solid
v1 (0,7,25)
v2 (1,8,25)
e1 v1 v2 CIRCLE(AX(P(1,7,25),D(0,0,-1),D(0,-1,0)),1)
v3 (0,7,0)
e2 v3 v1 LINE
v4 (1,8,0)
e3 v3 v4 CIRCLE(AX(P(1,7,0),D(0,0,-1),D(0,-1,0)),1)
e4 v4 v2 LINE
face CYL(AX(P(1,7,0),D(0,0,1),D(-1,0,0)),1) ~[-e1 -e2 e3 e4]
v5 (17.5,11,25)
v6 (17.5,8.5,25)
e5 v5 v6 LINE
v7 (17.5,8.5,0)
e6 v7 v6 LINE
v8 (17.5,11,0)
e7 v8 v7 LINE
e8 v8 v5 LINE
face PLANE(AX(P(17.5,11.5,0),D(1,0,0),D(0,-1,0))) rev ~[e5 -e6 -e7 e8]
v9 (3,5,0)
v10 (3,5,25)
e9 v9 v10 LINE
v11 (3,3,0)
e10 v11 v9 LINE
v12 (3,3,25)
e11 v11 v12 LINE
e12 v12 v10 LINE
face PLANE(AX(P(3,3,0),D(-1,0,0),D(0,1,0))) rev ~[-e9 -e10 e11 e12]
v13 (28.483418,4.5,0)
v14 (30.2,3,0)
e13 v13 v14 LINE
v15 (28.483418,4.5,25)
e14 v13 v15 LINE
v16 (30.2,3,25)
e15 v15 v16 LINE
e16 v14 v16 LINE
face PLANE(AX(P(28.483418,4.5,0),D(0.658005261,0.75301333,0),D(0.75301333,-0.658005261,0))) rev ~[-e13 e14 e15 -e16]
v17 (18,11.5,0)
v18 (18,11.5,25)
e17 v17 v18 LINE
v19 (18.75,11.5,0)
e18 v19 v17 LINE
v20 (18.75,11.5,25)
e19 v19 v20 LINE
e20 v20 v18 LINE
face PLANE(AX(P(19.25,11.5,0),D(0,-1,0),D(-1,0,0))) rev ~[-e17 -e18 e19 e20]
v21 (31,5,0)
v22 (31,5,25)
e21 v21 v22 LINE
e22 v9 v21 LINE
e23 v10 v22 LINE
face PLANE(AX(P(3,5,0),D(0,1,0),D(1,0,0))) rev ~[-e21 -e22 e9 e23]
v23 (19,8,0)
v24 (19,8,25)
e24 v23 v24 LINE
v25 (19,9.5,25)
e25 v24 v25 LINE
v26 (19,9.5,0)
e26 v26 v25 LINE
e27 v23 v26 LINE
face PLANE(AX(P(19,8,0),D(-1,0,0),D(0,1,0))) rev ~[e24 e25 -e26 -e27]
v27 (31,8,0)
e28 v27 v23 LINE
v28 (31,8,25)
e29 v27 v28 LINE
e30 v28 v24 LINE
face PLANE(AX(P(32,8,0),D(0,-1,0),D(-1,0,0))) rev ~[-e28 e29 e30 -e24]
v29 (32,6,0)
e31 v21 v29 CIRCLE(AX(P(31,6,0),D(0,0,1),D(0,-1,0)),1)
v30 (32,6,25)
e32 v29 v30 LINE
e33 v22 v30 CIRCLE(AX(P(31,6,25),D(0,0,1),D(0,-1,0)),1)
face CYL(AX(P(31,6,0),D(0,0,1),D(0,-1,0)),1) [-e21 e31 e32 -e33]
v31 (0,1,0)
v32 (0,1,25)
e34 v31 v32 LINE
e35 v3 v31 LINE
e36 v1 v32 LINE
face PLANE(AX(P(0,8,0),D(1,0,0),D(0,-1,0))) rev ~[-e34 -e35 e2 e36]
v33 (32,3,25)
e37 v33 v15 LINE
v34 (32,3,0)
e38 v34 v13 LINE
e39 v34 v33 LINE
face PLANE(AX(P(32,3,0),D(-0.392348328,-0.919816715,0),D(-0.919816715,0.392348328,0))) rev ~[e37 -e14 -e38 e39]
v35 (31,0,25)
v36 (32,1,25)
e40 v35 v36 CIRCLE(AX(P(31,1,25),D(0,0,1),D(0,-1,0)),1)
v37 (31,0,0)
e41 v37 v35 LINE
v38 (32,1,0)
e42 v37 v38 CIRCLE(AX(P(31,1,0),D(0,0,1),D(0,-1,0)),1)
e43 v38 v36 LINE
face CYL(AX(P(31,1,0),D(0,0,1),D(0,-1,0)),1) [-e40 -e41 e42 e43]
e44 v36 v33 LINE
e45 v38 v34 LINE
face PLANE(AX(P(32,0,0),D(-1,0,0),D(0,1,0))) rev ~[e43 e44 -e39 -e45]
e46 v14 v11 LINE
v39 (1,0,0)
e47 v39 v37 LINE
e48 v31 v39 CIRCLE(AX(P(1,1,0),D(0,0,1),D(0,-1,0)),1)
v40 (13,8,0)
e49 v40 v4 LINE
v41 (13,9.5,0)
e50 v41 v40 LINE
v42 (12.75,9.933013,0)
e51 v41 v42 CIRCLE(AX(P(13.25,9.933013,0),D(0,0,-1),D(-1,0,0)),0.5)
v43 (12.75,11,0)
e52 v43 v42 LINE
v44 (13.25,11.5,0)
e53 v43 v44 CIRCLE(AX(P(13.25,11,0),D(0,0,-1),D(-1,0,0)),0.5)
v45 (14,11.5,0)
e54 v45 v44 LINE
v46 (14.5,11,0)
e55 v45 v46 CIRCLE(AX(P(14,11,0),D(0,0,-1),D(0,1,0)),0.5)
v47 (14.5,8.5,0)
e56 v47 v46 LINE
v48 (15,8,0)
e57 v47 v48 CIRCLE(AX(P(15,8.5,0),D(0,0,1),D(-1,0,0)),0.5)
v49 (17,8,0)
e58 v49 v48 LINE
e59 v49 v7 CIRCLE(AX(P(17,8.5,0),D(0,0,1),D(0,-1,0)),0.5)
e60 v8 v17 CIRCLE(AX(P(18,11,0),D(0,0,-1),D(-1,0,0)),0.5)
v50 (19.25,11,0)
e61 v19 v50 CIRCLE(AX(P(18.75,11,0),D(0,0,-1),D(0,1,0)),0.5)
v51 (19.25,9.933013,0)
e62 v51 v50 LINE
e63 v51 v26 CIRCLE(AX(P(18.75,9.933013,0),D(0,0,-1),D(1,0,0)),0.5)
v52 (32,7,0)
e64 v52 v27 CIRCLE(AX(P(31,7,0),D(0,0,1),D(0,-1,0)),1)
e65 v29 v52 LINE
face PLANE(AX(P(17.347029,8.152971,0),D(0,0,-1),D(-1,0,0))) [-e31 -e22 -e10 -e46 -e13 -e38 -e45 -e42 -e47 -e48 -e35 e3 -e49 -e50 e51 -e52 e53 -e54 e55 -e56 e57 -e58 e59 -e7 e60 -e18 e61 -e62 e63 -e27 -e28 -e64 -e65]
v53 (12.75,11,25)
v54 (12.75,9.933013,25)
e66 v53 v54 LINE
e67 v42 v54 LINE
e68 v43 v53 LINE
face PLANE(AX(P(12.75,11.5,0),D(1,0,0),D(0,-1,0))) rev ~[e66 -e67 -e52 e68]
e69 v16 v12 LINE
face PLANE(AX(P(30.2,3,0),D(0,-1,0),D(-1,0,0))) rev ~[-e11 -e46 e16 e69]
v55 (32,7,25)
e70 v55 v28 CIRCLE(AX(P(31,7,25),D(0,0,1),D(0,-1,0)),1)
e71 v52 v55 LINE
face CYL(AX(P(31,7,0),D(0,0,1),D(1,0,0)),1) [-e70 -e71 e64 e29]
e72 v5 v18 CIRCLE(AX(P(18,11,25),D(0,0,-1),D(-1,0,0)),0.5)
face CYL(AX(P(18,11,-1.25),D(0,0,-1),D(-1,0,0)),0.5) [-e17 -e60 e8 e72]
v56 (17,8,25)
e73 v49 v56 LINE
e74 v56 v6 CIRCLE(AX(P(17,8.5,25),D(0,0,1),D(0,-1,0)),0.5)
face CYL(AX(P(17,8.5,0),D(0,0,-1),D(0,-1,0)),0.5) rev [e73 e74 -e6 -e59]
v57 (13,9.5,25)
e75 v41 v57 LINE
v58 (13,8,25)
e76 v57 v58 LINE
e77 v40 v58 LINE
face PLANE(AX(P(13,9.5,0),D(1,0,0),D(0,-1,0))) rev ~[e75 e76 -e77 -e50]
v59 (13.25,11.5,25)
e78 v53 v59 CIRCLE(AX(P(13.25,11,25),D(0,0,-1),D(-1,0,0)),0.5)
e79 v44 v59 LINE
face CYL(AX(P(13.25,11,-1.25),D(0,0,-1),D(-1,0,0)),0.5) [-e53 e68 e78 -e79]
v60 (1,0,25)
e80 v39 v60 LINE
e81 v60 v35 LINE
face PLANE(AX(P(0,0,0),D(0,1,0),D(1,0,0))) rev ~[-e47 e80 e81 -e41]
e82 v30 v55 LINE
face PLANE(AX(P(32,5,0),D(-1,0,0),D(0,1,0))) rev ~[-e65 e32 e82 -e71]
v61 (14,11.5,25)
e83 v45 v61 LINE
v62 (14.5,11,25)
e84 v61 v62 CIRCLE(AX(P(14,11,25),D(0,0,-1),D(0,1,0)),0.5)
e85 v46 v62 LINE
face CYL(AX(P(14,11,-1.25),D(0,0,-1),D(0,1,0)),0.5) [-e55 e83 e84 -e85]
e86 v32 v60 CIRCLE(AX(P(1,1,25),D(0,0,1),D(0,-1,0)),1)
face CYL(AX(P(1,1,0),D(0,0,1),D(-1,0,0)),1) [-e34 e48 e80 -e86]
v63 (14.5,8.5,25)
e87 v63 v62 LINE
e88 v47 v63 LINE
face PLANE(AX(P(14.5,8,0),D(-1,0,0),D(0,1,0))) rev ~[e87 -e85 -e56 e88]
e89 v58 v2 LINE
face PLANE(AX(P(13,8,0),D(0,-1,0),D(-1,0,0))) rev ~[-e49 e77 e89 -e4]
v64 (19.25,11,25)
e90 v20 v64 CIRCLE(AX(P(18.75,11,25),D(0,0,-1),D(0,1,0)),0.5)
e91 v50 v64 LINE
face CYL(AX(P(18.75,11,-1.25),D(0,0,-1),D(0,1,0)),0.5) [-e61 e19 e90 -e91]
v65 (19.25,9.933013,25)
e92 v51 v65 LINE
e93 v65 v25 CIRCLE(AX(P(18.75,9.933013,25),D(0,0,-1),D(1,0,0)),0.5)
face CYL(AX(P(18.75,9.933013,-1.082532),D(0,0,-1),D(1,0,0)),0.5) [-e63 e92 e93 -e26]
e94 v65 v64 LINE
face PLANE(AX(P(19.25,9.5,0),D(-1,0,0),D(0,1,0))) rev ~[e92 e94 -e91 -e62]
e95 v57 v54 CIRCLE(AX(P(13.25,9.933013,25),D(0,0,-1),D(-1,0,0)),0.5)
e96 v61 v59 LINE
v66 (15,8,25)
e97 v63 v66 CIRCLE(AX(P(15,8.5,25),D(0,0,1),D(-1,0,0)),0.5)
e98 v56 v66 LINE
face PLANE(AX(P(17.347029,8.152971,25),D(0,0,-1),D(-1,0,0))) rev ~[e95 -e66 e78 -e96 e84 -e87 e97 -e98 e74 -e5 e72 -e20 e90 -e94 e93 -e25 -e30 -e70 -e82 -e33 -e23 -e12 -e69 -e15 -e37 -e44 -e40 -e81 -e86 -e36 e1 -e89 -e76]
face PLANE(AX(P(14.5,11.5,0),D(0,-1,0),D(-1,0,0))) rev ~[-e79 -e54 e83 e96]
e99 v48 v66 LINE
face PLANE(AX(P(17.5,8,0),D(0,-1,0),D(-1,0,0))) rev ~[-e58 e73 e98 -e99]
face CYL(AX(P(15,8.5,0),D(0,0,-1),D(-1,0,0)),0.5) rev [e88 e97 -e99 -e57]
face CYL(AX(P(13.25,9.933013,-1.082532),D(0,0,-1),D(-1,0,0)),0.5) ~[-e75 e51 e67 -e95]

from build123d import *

# Parameters (mm, degrees)
F1_DEPTH     = 25
F2_R         = 1
F3_T1_DEPTH  = 25
F3_T3_DEPTH  = 25
F3_T5_DEPTH  = 27.1650635095
F3_T7_DEPTH  = 27.5
F3_T9_DEPTH  = 27.5
F3_T11_DEPTH = 27.5
F3_T13_DEPTH = 27.5
F3_T15_DEPTH = 27.1650635095


# Not quite as in the source:
# - a fillet or chamfer that OpenCascade refuses, or shapes differently, is made with other operations: its cross-section is extruded or revolved along the edge and cut away or added


with BuildPart() as f1:
    # F0 (on Top) → F1 (new body)
    with BuildSketch(Plane.XY):
        Polygon((0, 8), (0, 0), (32, 0), (32, 3), (30.2, 3), (3, 3), (3, 5), (32, 5), (32, 8), (19, 8), (19, 9.5), (19.25, 9.5), (19.25, 11.5), (17.5, 11.5), (17.5, 8), (14.5, 8), (14.5, 11.5), (12.75, 11.5), (12.75, 9.5), (13, 9.5), (13, 8), align=None)
        Polygon((30.2, 3), (32, 3), (28.4834179878, 4.5), align=None)
    extrude(amount=F1_DEPTH)

    # F2
    f2_edges = [f1.edges().sort_by_distance(p)[0] for p in [
        (32, 8, 12.5),
        (32, 5, 12.5),
        (32, 0, 12.5),
        (0, 0, 12.5),
        (0, 8, 12.5),
    ]]
    fillet(f2_edges, radius=F2_R)

    # F3: fillet of radius 0.5 on 8 edges, made by hand

    # F3_s2 → F3_t1 (join)
    with BuildSketch(Plane.XY):
        with BuildLine():
            ThreePointArc((14.5, 8.5), (14.6464466094, 8.1464466094), (15, 8))
            Line((15, 8), (14.5, 8))
            Line((14.5, 8), (14.5, 8.5))
        make_face()
    extrude(amount=F3_T1_DEPTH)

    # F3_s4 → F3_t3 (join)
    with BuildSketch(Plane.XY):
        with BuildLine():
            ThreePointArc((17, 8), (17.3535533906, 8.1464466094), (17.5, 8.5))
            Line((17.5, 8.5), (17.5, 8))
            Line((17.5, 8), (17, 8))
        make_face()
    extrude(amount=F3_T3_DEPTH)

    # F3_s6 → F3_t5 (cut)
    with BuildSketch(Plane.XY.offset(-1.0825317547)):
        with BuildLine():
            ThreePointArc((12.75, 9.9330127019), (12.8169872981, 9.6830127019), (13, 9.5))
            Line((13, 9.5), (12.75, 9.5))
            Line((12.75, 9.5), (12.75, 9.9330127019))
        make_face()
    extrude(amount=F3_T5_DEPTH, mode=Mode.SUBTRACT)

    # F3_s8 → F3_t7 (cut)
    with BuildSketch(Plane.XY.offset(-1.25)):
        with BuildLine():
            ThreePointArc((12.75, 11), (12.8964466094, 11.3535533906), (13.25, 11.5))
            Line((13.25, 11.5), (12.75, 11.5))
            Line((12.75, 11.5), (12.75, 11))
        make_face()
    extrude(amount=F3_T7_DEPTH, mode=Mode.SUBTRACT)

    # F3_s10 → F3_t9 (cut)
    with BuildSketch(Plane.XY.offset(-1.25)):
        with BuildLine():
            ThreePointArc((14, 11.5), (14.3535533906, 11.3535533906), (14.5, 11))
            Line((14.5, 11), (14.5, 11.5))
            Line((14.5, 11.5), (14, 11.5))
        make_face()
    extrude(amount=F3_T9_DEPTH, mode=Mode.SUBTRACT)

    # F3_s12 → F3_t11 (cut)
    with BuildSketch(Plane.XY.offset(-1.25)):
        with BuildLine():
            ThreePointArc((17.5, 11), (17.6464466094, 11.3535533906), (18, 11.5))
            Line((18, 11.5), (17.5, 11.5))
            Line((17.5, 11.5), (17.5, 11))
        make_face()
    extrude(amount=F3_T11_DEPTH, mode=Mode.SUBTRACT)

    # F3_s14 → F3_t13 (cut)
    with BuildSketch(Plane.XY.offset(-1.25)):
        with BuildLine():
            ThreePointArc((18.75, 11.5), (19.1035533906, 11.3535533906), (19.25, 11))
            Line((19.25, 11), (19.25, 11.5))
            Line((19.25, 11.5), (18.75, 11.5))
        make_face()
    extrude(amount=F3_T13_DEPTH, mode=Mode.SUBTRACT)

    # F3_s16 → F3_t15 (cut)
    with BuildSketch(Plane.XY.offset(-1.0825317547)):
        with BuildLine():
            ThreePointArc((19.25, 9.9330127019), (19.1830127019, 9.6830127019), (19, 9.5))
            Line((19, 9.5), (19.25, 9.5))
            Line((19.25, 9.5), (19.25, 9.9330127019))
        make_face()
    extrude(amount=F3_T15_DEPTH, mode=Mode.SUBTRACT)


solid = f1.part
